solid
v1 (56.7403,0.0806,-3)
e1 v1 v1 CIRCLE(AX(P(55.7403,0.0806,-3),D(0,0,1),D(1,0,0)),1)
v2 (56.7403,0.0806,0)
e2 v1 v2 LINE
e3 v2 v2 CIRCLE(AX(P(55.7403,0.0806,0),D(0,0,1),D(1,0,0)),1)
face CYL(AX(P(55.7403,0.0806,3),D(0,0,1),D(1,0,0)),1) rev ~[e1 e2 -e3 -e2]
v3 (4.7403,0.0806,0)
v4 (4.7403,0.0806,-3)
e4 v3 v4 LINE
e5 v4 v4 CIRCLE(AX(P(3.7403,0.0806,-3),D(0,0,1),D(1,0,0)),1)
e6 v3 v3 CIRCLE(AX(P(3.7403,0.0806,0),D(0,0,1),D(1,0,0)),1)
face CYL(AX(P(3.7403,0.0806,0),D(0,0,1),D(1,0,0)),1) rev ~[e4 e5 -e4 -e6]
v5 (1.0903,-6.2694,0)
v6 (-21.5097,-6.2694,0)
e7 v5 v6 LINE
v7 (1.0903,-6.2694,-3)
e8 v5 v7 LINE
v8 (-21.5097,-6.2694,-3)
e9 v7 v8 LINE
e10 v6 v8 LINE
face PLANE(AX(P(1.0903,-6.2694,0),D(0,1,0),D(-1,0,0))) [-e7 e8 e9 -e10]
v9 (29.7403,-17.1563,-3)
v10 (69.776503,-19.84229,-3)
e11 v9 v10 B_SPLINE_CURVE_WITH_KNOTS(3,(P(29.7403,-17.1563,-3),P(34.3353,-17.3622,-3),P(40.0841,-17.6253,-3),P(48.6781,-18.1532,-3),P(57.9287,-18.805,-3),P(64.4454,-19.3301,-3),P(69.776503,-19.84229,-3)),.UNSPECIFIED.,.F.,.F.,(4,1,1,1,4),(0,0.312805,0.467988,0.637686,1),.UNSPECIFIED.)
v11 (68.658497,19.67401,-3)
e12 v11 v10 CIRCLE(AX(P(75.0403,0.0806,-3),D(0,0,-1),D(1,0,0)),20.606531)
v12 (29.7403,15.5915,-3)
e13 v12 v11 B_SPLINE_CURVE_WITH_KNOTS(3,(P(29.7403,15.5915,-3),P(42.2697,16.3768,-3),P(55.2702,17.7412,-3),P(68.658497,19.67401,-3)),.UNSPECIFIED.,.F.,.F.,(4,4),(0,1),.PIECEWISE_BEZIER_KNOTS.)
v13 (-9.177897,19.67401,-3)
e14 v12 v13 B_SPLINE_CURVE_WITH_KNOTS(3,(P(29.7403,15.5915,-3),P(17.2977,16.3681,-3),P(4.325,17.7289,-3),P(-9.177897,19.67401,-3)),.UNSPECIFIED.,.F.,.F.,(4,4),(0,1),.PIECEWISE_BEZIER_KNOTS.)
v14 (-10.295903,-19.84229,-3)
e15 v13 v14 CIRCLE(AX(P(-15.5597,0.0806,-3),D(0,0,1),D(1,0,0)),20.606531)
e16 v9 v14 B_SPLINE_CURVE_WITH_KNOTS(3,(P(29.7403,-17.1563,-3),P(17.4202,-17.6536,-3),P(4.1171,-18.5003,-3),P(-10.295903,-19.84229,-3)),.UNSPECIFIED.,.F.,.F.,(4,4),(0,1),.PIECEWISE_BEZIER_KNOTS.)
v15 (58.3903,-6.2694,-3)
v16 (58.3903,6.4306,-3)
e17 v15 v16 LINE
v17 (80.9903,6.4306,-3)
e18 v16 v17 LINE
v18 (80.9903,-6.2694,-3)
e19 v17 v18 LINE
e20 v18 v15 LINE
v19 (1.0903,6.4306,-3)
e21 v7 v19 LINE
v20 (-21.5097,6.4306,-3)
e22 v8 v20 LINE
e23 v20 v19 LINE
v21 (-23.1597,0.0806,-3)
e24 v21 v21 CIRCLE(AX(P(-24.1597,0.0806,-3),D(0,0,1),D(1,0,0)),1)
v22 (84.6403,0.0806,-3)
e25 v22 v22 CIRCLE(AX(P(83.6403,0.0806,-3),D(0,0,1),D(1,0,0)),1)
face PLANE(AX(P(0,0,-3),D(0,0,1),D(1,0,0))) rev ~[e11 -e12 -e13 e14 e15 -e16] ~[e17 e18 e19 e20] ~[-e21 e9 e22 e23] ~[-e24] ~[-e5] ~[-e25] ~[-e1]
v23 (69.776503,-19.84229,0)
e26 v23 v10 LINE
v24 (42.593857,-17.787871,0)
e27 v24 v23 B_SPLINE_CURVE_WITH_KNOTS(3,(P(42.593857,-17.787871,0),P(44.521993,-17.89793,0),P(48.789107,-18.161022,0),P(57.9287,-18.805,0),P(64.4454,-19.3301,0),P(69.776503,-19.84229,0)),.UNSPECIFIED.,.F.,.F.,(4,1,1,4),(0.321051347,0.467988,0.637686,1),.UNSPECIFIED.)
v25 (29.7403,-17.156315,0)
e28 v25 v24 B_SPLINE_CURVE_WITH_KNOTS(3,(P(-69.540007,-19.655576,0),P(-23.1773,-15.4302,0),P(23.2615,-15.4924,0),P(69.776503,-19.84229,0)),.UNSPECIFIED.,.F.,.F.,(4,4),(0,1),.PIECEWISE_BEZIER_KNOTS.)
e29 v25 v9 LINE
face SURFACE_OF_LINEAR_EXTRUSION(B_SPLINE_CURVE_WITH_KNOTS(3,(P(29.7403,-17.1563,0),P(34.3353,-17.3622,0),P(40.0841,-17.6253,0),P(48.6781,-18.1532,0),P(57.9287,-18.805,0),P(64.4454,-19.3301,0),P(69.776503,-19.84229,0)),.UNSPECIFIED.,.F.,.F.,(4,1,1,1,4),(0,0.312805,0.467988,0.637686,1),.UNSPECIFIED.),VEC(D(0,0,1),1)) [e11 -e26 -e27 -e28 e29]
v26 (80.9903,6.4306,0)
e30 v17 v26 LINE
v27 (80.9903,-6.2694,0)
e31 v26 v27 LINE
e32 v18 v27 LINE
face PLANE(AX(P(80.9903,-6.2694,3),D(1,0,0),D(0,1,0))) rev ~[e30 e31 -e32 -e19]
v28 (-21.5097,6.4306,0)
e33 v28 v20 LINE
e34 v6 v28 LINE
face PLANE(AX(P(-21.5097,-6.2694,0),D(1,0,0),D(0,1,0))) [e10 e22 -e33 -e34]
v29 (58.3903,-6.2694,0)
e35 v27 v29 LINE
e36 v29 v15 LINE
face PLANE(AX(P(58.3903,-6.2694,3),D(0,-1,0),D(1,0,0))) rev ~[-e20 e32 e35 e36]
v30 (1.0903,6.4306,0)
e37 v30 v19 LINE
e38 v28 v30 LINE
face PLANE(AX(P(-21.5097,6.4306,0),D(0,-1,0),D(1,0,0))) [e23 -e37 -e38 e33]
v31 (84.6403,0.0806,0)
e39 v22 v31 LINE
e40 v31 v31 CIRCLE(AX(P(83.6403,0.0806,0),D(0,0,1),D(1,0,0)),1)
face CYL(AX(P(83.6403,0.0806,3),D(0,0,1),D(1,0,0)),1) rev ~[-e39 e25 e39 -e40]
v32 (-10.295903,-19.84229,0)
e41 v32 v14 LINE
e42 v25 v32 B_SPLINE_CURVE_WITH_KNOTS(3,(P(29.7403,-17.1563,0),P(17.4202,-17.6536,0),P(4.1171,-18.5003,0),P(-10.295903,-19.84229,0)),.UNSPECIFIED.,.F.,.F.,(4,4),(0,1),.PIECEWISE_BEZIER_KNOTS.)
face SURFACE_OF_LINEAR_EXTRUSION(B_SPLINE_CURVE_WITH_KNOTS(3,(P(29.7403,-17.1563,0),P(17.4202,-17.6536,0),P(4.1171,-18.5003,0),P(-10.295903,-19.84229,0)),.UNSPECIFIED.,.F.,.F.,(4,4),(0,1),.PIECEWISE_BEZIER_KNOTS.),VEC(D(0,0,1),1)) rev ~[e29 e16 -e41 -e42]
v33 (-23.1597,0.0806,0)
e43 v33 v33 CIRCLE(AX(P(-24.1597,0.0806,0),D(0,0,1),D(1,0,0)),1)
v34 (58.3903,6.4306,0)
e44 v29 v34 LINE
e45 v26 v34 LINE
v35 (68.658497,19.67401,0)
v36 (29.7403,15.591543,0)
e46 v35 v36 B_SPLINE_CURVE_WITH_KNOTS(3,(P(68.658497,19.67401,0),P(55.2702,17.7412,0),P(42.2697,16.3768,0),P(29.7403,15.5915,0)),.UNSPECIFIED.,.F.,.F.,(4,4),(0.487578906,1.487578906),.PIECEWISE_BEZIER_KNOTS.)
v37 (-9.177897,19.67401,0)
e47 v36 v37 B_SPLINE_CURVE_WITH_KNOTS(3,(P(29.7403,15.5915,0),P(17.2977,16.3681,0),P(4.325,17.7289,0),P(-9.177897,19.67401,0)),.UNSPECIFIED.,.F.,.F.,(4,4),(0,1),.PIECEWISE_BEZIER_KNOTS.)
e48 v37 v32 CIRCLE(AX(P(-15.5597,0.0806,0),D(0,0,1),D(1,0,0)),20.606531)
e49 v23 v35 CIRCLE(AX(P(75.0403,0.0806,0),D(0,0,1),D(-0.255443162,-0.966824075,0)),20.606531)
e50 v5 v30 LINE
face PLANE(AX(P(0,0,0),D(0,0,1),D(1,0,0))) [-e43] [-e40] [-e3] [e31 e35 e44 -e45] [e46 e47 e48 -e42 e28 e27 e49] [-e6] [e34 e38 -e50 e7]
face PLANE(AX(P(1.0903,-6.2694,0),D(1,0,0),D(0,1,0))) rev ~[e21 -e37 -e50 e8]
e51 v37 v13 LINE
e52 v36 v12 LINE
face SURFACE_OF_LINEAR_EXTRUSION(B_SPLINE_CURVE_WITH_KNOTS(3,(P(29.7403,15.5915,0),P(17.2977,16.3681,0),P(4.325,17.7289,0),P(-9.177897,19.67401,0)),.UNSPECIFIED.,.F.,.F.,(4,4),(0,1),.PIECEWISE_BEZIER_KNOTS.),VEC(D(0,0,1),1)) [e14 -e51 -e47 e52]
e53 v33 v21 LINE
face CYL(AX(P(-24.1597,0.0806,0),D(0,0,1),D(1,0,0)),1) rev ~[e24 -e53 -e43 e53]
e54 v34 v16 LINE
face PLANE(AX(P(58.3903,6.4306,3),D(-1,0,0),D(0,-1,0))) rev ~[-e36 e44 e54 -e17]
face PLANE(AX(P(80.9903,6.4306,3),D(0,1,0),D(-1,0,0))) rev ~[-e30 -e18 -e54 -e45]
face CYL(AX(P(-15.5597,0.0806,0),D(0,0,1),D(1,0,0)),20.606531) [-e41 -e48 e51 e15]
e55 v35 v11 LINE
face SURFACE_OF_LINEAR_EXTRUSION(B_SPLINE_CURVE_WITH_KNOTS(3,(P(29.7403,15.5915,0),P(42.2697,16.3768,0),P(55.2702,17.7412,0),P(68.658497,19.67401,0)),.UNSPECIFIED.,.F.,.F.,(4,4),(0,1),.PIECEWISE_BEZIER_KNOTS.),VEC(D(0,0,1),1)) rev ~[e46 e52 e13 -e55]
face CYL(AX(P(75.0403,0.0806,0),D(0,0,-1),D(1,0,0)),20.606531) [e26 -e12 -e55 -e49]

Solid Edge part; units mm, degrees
sketch "Sketch1" plane through (0, 0, 0) normal (0, 0, 1) x (1, 0, 0)
  spline S0 degree 3 poles (-69.5242, 19.4932) (-23.3267, 12.9257) (22.6888, 12.9752) (68.6585, 19.674) knots 0 0 0 0 1 1 1 1
  spline S1 degree 3 poles (-69.54, -19.6556) (-23.1773, -15.4302) (23.2615, -15.4924) (69.7765, -19.8423) knots 0 0 0 0 1 1 1 1
  arc A0 (-69.54, -19.6556) -> (-69.5242, 19.4932) centre (-75.1666, -0.0789) cw
  arc A1 (68.6585, 19.674) -> (69.7765, -19.8423) centre (75.0403, 0.0806) cw
extrude "Protrusion1" add sketch "Sketch1" along normal blind 3
sketch "Sketch2" plane through (0.0555, 0.0806, 3) normal (0, 0, 1) x (1, 0, 0)
  circle A0 centre (83.5848, 0) radius 1
  circle A1 centre (55.6848, 0) radius 1
  line L0 (-58.5721, -6.5095) -> (-58.5721, 6.1905)
  line L1 (-58.5721, 6.1905) -> (-81.1721, 6.1905)
  line L2 (-81.1721, 6.1905) -> (-81.1721, -6.5095)
  line L3 (-81.1721, -6.5095) -> (-58.5721, -6.5095)
  circle A2 centre (-83.8221, -0.1595) radius 1
  circle A3 centre (-55.9221, -0.1595) radius 1
  line L4 (58.3348, 6.35) -> (58.3348, -6.35)
  line L5 (58.3348, -6.35) -> (80.9348, -6.35)
  line L6 (80.9348, -6.35) -> (80.9348, 6.35)
  line L7 (80.9348, 6.35) -> (58.3348, 6.35)
  dimension "D1" = 22.6
  dimension "D2" = 22.6
  dimension "D3" = 12.7
extrude "ExtrudedCutout_1" cut sketch "Sketch2" against normal blind 484.752
sketch "Sketch3" plane through (0.0555, 0.0806, 3) normal (0, 0, 1) x (1, 0, 0)
  line L0 (29.6848, 27.4896) -> (-99.1539, 27.4896)
  line L1 (-99.1539, 27.4896) -> (-99.1539, -25.8213)
  line L2 (-99.1539, -25.8213) -> (29.6848, -25.8213)
  line L3 (29.6848, -25.8213) -> (29.6848, 27.4896)
extrude "ExtrudedCutout_2" cut sketch "Sketch3" against normal blind 169.5138
sketch "Sketch4" plane through (0, 0, 0) normal (0, 0, 1) x (1, 0, 0)
  line L0 (29.7403, -17.1563) -> (29.7403, 15.5915)
  spline S0 degree 3 poles (29.7403, 15.5915) (42.2697, 16.3768) (55.2702, 17.7412) (68.6585, 19.674) knots 0 0 0 0 1 1 1 1
  spline S1 degree 3 poles (29.7403, -17.1563) (34.3353, -17.3622) (40.0841, -17.6253) (48.6781, -18.1532) (57.9287, -18.805) (64.4454, -19.3301) (69.7765, -19.8423) knots 0 0 0 0 0.312805 0.467988 0.637686 1 1 1 1
  arc A0 (68.6585, 19.674) -> (69.7765, -19.8423) centre (75.0403, 0.0806) cw
  line L1 (58.3903, -6.2694) -> (58.3903, 6.4306)
  line L2 (58.3903, 6.4306) -> (80.9903, 6.4306)
  line L3 (80.9903, 6.4306) -> (80.9903, -6.2694)
  line L4 (80.9903, -6.2694) -> (58.3903, -6.2694)
  circle A1 centre (55.7403, 0.0806) radius 1
  circle A2 centre (83.6403, 0.0806) radius 1
  line L5 (29.7403, -17.1563) -> (29.7403, 15.5915)
  spline S2 degree 3 poles (29.7403, 15.5915) (17.2109, 16.3768) (4.2104, 17.7412) (-9.1779, 19.674) knots 0 0 0 0 1 1 1 1
  arc A3 (-9.1779, 19.674) -> (-10.2959, -19.8423) centre (-15.5597, 0.0806) ccw
  spline S3 degree 3 poles (29.7403, -17.1563) (25.1453, -17.3622) (19.3965, -17.6253) (10.8024, -18.1532) (1.5519, -18.805) (-4.9648, -19.3301) (-10.2959, -19.8423) knots 0 0 0 0 0.312805 0.467988 0.637686 1 1 1 1
  line L6 (1.0903, -6.2694) -> (1.0903, 6.4306)
  line L7 (1.0903, 6.4306) -> (-21.5097, 6.4306)
  line L8 (-21.5097, 6.4306) -> (-21.5097, -6.2694)
  line L9 (-21.5097, -6.2694) -> (1.0903, -6.2694)
  circle A4 centre (3.7403, 0.0806) radius 1
  circle A5 centre (-24.1597, 0.0806) radius 1
extrude "ExtrudedProtrusion_2" add sketch "Sketch4" against normal blind 3
sketch "Sketch5" plane through (-3.213, 0.0806, 0) normal (0, 0, 1) x (0, 1, 0)
  line L0 (25.6992, -32.9533) -> (-24.0131, -32.9533)
  line L1 (-24.0131, -32.9533) -> (-24.0131, 35.3247)
  line L2 (-24.0131, 35.3247) -> (25.6992, 35.3247)
  line L3 (25.6992, 35.3247) -> (25.6992, -32.9533)
extrude "ExtrudedCutout_3" cut sketch "Sketch5" against normal blind 310.7547
sketch "Sketch6" plane through (69.6903, 6.4306, 0) normal (0, -1, 0) x (1, 0, 0)
  line L0 (-39.95, 3) -> (25.9565, 3)
  line L1 (25.9565, 3) -> (25.9565, 0)
  line L2 (25.9565, 0) -> (-39.95, 0)
  line L3 (-39.95, 0) -> (-39.95, 3)
extrude "ExtrudedCutout_4" cut sketch "Sketch6" against normal blind 369.6121
sketch "Sketch7" plane through (69.6903, -6.2694, 0) normal (0, 1, 0) x (1, 0, 0)
  line L0 (-39.95, -0.4111) -> (-39.95, -3)
  line L1 (-39.95, -3) -> (25.7218, -3)
  line L2 (25.7218, -3) -> (25.9565, 0)
  line L3 (25.9565, 0) -> (-39.95, -0.4111)
extrude "ExtrudedCutout_5" cut sketch "Sketch7" against normal blind 176.465
sketch "Sketch8" plane through (29.7403, -0.7635, 0) normal (-1, 0, 0) x (0, -1, 0)
  line L0 (20.933, 0) -> (-7.194, 0)
  line L1 (-7.194, 0) -> (-7.194, 4.1468)
  line L2 (-7.194, 4.1468) -> (20.933, 4.1468)
  line L3 (20.933, 4.1468) -> (20.933, 0)
extrude "ExtrudedCutout_6" cut sketch "Sketch8" against normal blind 228.3963
sketch "Sketch9" plane through (0, 0, 0) normal (0, 0, 1) x (1, 0, 0)
  line L0 (-21.5097, -6.2694) -> (-21.5097, 6.4306)
  line L1 (-21.5097, 6.4306) -> (1.0903, 6.4306)
  line L2 (1.0903, -6.2694) -> (1.0903, 6.4306)
  line L3 (1.0903, -6.2694) -> (-21.5097, -6.2694)
  circle A0 centre (3.7403, 0.0806) radius 1
  circle A1 centre (-24.1597, 0.0806) radius 1
  spline S0 degree 3 poles (29.7403, 15.5915) (17.2977, 16.3681) (4.325, 17.7289) (-9.1779, 19.674) knots 0 0 0 0 1 1 1 1
  arc A2 (-9.1779, 19.674) -> (-10.2959, -19.8423) centre (-15.5597, 0.0806) ccw
  spline S1 degree 3 poles (29.7403, -17.1563) (17.4202, -17.6536) (4.1171, -18.5003) (-10.2959, -19.8423) knots 0 0 0 0 1 1 1 1
  line L4 (29.7403, -17.1563) -> (29.7403, 15.5915)
extrude "ExtrudedProtrusion_3" add sketch "Sketch9" against normal blind 3
